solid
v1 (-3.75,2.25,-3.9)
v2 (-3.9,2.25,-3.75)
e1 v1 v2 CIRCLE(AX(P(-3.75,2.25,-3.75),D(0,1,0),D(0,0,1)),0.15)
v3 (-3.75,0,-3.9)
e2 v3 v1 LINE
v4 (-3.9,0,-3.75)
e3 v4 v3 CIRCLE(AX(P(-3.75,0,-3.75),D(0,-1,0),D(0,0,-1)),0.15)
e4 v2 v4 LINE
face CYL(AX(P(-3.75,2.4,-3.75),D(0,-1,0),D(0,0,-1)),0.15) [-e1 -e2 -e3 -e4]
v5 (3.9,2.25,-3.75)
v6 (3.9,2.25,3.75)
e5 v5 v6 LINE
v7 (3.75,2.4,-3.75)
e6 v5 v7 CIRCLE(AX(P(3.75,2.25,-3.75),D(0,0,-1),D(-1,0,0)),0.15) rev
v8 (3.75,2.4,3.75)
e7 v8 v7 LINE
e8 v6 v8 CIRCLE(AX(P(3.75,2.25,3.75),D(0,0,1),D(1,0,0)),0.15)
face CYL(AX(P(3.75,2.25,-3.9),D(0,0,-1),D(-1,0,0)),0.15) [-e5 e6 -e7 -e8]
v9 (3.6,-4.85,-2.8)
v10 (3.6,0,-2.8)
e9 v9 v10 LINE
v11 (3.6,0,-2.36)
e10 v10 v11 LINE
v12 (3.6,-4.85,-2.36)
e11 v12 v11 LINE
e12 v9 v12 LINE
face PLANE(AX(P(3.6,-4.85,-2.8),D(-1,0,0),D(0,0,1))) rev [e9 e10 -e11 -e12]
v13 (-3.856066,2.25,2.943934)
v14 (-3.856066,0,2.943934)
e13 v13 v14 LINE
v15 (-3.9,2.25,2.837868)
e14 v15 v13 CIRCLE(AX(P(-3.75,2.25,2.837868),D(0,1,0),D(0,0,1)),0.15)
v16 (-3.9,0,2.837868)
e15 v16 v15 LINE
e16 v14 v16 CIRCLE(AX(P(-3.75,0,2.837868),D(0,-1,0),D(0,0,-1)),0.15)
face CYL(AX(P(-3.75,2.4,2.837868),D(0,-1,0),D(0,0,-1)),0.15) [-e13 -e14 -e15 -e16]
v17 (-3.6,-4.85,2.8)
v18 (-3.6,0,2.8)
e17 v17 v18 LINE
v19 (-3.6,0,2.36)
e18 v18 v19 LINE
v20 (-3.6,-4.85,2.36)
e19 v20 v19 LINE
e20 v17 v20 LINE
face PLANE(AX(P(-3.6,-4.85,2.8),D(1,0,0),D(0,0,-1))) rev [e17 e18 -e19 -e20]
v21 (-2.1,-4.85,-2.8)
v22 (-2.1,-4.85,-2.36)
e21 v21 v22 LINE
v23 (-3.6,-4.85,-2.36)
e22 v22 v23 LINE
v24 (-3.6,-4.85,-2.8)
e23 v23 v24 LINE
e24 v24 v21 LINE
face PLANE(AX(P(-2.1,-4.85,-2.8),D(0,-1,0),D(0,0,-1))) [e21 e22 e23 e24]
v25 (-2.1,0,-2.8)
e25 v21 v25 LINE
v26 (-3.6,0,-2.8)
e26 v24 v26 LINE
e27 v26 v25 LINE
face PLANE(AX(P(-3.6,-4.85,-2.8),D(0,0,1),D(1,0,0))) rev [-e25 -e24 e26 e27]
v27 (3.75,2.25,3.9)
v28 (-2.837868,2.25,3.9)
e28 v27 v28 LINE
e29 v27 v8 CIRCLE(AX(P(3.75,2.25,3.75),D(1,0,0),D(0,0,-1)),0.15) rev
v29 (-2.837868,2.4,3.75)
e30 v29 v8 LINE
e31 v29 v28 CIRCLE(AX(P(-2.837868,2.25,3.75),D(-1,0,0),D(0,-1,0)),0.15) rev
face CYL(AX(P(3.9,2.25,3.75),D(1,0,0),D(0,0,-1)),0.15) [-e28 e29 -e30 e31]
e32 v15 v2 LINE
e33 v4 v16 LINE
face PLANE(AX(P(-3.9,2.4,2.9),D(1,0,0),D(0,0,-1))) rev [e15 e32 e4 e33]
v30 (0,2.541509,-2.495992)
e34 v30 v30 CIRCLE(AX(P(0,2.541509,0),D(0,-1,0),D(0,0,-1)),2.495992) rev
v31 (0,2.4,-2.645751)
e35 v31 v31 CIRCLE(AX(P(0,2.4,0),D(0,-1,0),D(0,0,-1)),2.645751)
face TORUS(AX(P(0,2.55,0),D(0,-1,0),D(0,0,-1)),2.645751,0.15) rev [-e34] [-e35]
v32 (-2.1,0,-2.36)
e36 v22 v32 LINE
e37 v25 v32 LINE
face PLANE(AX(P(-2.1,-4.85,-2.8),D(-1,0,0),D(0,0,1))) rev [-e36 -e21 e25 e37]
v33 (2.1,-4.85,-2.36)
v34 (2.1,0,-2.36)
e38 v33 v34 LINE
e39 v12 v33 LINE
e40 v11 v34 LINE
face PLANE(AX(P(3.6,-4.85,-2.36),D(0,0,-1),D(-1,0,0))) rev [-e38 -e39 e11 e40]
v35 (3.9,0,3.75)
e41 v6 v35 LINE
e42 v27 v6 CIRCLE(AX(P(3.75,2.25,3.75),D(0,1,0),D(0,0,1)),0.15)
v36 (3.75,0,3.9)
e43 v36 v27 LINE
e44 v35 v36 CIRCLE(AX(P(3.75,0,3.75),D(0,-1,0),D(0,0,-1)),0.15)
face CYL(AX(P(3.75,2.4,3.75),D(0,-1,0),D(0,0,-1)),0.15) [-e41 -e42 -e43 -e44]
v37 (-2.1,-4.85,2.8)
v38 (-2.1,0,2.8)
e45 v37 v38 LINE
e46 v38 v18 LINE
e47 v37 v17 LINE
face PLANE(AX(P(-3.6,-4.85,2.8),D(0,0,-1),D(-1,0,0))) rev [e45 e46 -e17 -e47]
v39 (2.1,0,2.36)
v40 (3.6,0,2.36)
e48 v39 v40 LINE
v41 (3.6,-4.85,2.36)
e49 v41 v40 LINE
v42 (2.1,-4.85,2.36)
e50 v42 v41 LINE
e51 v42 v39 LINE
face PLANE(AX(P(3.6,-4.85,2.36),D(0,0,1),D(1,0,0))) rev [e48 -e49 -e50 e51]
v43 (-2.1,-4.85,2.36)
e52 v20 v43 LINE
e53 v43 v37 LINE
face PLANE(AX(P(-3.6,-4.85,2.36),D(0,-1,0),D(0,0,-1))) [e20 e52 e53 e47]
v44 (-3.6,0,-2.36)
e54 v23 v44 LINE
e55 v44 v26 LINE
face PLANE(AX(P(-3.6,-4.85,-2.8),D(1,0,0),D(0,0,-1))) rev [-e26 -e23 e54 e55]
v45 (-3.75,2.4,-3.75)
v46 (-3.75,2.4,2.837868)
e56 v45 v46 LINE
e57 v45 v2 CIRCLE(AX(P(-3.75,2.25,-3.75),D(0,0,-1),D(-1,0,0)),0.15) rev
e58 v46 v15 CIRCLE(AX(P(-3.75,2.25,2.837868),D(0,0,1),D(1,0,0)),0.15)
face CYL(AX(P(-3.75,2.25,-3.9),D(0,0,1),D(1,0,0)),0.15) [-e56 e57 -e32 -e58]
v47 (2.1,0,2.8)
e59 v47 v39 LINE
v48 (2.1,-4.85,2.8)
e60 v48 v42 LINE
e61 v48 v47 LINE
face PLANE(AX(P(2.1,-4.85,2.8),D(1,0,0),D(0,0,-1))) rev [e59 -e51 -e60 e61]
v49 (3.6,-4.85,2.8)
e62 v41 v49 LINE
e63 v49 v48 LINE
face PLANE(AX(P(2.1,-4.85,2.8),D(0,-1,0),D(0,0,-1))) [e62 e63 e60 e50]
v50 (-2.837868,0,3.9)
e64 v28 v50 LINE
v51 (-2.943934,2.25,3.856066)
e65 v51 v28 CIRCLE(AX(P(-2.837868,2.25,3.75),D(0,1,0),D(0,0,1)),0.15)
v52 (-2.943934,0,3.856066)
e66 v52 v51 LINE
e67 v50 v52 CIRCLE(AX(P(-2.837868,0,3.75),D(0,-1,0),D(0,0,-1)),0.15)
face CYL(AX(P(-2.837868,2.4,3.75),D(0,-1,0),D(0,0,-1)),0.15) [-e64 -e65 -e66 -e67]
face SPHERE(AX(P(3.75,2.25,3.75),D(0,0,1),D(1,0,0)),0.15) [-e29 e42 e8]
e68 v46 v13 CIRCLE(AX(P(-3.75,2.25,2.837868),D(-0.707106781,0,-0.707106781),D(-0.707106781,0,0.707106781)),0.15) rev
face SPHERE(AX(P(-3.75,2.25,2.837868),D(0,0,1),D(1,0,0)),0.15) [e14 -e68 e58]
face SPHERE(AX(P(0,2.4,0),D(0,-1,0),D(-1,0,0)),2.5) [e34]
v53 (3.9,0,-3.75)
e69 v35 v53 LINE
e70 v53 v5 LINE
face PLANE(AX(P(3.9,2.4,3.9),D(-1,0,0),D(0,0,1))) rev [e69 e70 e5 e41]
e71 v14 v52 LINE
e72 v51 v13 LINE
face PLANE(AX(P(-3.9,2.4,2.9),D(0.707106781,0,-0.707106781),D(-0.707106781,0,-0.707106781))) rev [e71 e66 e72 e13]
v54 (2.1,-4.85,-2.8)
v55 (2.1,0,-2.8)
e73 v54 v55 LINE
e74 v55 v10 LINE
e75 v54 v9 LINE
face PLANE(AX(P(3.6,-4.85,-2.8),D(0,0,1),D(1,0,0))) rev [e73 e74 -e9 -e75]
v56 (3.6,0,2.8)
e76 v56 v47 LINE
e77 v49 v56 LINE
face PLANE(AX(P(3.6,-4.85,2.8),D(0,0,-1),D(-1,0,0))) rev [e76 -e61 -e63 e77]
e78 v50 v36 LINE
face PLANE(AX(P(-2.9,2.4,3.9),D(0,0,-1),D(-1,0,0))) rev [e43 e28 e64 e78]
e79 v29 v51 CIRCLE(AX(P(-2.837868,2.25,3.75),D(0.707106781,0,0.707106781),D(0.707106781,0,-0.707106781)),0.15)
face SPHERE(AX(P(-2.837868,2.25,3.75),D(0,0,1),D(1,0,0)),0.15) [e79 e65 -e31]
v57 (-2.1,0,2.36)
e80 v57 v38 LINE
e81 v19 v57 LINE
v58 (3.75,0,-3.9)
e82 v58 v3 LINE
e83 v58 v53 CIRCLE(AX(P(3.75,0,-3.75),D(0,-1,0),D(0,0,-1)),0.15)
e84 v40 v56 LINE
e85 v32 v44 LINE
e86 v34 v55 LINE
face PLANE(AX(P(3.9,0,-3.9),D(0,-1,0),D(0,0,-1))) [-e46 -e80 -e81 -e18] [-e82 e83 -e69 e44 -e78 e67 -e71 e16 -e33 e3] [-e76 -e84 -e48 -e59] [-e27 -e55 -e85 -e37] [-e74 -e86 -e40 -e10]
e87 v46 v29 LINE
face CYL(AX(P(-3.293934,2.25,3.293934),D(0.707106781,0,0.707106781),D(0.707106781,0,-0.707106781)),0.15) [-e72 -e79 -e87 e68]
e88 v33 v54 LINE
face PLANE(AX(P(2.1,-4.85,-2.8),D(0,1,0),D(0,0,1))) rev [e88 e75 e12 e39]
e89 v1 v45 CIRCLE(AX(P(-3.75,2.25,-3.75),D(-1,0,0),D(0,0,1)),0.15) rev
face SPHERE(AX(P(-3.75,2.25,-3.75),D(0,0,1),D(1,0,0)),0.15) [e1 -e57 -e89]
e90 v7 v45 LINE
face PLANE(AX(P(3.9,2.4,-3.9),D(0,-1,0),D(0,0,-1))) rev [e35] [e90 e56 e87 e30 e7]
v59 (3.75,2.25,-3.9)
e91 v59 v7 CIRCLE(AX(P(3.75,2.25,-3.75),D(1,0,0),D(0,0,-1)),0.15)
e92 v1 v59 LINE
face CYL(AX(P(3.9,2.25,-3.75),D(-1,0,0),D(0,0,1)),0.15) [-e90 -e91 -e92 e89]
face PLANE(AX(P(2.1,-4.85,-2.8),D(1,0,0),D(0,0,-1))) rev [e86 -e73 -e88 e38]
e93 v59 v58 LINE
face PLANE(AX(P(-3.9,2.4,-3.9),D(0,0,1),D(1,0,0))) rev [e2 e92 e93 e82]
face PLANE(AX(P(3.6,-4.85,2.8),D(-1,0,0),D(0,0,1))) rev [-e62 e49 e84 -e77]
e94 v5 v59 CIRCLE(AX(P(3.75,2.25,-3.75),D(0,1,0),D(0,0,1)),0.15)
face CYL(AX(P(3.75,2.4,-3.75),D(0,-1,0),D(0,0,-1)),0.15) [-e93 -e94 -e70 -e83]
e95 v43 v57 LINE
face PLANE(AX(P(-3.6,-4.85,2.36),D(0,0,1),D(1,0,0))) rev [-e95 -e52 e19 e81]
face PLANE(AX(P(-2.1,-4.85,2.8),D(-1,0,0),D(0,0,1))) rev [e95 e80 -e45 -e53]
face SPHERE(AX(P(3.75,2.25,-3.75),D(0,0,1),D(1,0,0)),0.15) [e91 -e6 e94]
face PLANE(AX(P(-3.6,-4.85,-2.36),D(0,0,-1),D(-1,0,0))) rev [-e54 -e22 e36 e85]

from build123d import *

# Parameters (mm, degrees)
EXTRUDE1_DEPTH = 2.4
FILLET1_R      = 0.15
SKETCH3_W      = 1.5
SKETCH3_H      = 0.44
EXTRUDE2_DEPTH = 4.85


with BuildPart() as part:
    # Sketch1 → Extrude1 (new body)
    with BuildSketch(Plane(origin=(0, 0, 0), x_dir=(1, 0, 0), z_dir=(0, 1, 0))):
        Polygon((-2.9, -3.9), (3.9, -3.9), (3.9, 3.9), (-3.9, 3.9), (-3.9, -2.9), align=None)
    extrude(amount=EXTRUDE1_DEPTH)

    # Sketch2 → Revolve1 (revolve)
    with BuildSketch(Plane.XY):
        with BuildLine():
            ThreePointArc((0, 4.9), (-1.767766953, 4.167766953), (-2.5, 2.4))
            Line((-2.5, 2.4), (0, 2.4))
            Line((0, 2.4), (0, 4.9))
        make_face()
    revolve(axis=Axis((0, 2.4, 0), (0, 1, 0)))

    # Fillet1
    fillet1_edges = [part.edges().sort_by_distance(p)[0] for p in [
        (2.5, 2.4, 0),
        (0.5, 2.4, 3.9),
        (-3.4, 2.4, 3.4),
        (-3.9, 2.4, -0.5),
        (0, 2.4, -3.9),
        (3.9, 2.4, 0),
        (-3.9, 1.2, -3.9),
        (3.9, 1.2, -3.9),
        (3.9, 1.2, 3.9),
        (-3.9, 1.2, 2.9),
        (-2.9, 1.2, 3.9),
    ]]
    fillet(fillet1_edges, radius=FILLET1_R)

    # Sketch3 → Extrude2 (add)
    with BuildSketch(Plane.XZ):
        with Locations((-2.85, 2.58)):
            Rectangle(SKETCH3_W, SKETCH3_H)
        with Locations((2.85, 2.58)):
            Rectangle(SKETCH3_W, SKETCH3_H)
        with Locations((2.85, -2.58)):
            Rectangle(SKETCH3_W, SKETCH3_H)
        with Locations((-2.85, -2.58)):
            Rectangle(SKETCH3_W, SKETCH3_H)
    extrude(amount=EXTRUDE2_DEPTH)


solid = part.part
